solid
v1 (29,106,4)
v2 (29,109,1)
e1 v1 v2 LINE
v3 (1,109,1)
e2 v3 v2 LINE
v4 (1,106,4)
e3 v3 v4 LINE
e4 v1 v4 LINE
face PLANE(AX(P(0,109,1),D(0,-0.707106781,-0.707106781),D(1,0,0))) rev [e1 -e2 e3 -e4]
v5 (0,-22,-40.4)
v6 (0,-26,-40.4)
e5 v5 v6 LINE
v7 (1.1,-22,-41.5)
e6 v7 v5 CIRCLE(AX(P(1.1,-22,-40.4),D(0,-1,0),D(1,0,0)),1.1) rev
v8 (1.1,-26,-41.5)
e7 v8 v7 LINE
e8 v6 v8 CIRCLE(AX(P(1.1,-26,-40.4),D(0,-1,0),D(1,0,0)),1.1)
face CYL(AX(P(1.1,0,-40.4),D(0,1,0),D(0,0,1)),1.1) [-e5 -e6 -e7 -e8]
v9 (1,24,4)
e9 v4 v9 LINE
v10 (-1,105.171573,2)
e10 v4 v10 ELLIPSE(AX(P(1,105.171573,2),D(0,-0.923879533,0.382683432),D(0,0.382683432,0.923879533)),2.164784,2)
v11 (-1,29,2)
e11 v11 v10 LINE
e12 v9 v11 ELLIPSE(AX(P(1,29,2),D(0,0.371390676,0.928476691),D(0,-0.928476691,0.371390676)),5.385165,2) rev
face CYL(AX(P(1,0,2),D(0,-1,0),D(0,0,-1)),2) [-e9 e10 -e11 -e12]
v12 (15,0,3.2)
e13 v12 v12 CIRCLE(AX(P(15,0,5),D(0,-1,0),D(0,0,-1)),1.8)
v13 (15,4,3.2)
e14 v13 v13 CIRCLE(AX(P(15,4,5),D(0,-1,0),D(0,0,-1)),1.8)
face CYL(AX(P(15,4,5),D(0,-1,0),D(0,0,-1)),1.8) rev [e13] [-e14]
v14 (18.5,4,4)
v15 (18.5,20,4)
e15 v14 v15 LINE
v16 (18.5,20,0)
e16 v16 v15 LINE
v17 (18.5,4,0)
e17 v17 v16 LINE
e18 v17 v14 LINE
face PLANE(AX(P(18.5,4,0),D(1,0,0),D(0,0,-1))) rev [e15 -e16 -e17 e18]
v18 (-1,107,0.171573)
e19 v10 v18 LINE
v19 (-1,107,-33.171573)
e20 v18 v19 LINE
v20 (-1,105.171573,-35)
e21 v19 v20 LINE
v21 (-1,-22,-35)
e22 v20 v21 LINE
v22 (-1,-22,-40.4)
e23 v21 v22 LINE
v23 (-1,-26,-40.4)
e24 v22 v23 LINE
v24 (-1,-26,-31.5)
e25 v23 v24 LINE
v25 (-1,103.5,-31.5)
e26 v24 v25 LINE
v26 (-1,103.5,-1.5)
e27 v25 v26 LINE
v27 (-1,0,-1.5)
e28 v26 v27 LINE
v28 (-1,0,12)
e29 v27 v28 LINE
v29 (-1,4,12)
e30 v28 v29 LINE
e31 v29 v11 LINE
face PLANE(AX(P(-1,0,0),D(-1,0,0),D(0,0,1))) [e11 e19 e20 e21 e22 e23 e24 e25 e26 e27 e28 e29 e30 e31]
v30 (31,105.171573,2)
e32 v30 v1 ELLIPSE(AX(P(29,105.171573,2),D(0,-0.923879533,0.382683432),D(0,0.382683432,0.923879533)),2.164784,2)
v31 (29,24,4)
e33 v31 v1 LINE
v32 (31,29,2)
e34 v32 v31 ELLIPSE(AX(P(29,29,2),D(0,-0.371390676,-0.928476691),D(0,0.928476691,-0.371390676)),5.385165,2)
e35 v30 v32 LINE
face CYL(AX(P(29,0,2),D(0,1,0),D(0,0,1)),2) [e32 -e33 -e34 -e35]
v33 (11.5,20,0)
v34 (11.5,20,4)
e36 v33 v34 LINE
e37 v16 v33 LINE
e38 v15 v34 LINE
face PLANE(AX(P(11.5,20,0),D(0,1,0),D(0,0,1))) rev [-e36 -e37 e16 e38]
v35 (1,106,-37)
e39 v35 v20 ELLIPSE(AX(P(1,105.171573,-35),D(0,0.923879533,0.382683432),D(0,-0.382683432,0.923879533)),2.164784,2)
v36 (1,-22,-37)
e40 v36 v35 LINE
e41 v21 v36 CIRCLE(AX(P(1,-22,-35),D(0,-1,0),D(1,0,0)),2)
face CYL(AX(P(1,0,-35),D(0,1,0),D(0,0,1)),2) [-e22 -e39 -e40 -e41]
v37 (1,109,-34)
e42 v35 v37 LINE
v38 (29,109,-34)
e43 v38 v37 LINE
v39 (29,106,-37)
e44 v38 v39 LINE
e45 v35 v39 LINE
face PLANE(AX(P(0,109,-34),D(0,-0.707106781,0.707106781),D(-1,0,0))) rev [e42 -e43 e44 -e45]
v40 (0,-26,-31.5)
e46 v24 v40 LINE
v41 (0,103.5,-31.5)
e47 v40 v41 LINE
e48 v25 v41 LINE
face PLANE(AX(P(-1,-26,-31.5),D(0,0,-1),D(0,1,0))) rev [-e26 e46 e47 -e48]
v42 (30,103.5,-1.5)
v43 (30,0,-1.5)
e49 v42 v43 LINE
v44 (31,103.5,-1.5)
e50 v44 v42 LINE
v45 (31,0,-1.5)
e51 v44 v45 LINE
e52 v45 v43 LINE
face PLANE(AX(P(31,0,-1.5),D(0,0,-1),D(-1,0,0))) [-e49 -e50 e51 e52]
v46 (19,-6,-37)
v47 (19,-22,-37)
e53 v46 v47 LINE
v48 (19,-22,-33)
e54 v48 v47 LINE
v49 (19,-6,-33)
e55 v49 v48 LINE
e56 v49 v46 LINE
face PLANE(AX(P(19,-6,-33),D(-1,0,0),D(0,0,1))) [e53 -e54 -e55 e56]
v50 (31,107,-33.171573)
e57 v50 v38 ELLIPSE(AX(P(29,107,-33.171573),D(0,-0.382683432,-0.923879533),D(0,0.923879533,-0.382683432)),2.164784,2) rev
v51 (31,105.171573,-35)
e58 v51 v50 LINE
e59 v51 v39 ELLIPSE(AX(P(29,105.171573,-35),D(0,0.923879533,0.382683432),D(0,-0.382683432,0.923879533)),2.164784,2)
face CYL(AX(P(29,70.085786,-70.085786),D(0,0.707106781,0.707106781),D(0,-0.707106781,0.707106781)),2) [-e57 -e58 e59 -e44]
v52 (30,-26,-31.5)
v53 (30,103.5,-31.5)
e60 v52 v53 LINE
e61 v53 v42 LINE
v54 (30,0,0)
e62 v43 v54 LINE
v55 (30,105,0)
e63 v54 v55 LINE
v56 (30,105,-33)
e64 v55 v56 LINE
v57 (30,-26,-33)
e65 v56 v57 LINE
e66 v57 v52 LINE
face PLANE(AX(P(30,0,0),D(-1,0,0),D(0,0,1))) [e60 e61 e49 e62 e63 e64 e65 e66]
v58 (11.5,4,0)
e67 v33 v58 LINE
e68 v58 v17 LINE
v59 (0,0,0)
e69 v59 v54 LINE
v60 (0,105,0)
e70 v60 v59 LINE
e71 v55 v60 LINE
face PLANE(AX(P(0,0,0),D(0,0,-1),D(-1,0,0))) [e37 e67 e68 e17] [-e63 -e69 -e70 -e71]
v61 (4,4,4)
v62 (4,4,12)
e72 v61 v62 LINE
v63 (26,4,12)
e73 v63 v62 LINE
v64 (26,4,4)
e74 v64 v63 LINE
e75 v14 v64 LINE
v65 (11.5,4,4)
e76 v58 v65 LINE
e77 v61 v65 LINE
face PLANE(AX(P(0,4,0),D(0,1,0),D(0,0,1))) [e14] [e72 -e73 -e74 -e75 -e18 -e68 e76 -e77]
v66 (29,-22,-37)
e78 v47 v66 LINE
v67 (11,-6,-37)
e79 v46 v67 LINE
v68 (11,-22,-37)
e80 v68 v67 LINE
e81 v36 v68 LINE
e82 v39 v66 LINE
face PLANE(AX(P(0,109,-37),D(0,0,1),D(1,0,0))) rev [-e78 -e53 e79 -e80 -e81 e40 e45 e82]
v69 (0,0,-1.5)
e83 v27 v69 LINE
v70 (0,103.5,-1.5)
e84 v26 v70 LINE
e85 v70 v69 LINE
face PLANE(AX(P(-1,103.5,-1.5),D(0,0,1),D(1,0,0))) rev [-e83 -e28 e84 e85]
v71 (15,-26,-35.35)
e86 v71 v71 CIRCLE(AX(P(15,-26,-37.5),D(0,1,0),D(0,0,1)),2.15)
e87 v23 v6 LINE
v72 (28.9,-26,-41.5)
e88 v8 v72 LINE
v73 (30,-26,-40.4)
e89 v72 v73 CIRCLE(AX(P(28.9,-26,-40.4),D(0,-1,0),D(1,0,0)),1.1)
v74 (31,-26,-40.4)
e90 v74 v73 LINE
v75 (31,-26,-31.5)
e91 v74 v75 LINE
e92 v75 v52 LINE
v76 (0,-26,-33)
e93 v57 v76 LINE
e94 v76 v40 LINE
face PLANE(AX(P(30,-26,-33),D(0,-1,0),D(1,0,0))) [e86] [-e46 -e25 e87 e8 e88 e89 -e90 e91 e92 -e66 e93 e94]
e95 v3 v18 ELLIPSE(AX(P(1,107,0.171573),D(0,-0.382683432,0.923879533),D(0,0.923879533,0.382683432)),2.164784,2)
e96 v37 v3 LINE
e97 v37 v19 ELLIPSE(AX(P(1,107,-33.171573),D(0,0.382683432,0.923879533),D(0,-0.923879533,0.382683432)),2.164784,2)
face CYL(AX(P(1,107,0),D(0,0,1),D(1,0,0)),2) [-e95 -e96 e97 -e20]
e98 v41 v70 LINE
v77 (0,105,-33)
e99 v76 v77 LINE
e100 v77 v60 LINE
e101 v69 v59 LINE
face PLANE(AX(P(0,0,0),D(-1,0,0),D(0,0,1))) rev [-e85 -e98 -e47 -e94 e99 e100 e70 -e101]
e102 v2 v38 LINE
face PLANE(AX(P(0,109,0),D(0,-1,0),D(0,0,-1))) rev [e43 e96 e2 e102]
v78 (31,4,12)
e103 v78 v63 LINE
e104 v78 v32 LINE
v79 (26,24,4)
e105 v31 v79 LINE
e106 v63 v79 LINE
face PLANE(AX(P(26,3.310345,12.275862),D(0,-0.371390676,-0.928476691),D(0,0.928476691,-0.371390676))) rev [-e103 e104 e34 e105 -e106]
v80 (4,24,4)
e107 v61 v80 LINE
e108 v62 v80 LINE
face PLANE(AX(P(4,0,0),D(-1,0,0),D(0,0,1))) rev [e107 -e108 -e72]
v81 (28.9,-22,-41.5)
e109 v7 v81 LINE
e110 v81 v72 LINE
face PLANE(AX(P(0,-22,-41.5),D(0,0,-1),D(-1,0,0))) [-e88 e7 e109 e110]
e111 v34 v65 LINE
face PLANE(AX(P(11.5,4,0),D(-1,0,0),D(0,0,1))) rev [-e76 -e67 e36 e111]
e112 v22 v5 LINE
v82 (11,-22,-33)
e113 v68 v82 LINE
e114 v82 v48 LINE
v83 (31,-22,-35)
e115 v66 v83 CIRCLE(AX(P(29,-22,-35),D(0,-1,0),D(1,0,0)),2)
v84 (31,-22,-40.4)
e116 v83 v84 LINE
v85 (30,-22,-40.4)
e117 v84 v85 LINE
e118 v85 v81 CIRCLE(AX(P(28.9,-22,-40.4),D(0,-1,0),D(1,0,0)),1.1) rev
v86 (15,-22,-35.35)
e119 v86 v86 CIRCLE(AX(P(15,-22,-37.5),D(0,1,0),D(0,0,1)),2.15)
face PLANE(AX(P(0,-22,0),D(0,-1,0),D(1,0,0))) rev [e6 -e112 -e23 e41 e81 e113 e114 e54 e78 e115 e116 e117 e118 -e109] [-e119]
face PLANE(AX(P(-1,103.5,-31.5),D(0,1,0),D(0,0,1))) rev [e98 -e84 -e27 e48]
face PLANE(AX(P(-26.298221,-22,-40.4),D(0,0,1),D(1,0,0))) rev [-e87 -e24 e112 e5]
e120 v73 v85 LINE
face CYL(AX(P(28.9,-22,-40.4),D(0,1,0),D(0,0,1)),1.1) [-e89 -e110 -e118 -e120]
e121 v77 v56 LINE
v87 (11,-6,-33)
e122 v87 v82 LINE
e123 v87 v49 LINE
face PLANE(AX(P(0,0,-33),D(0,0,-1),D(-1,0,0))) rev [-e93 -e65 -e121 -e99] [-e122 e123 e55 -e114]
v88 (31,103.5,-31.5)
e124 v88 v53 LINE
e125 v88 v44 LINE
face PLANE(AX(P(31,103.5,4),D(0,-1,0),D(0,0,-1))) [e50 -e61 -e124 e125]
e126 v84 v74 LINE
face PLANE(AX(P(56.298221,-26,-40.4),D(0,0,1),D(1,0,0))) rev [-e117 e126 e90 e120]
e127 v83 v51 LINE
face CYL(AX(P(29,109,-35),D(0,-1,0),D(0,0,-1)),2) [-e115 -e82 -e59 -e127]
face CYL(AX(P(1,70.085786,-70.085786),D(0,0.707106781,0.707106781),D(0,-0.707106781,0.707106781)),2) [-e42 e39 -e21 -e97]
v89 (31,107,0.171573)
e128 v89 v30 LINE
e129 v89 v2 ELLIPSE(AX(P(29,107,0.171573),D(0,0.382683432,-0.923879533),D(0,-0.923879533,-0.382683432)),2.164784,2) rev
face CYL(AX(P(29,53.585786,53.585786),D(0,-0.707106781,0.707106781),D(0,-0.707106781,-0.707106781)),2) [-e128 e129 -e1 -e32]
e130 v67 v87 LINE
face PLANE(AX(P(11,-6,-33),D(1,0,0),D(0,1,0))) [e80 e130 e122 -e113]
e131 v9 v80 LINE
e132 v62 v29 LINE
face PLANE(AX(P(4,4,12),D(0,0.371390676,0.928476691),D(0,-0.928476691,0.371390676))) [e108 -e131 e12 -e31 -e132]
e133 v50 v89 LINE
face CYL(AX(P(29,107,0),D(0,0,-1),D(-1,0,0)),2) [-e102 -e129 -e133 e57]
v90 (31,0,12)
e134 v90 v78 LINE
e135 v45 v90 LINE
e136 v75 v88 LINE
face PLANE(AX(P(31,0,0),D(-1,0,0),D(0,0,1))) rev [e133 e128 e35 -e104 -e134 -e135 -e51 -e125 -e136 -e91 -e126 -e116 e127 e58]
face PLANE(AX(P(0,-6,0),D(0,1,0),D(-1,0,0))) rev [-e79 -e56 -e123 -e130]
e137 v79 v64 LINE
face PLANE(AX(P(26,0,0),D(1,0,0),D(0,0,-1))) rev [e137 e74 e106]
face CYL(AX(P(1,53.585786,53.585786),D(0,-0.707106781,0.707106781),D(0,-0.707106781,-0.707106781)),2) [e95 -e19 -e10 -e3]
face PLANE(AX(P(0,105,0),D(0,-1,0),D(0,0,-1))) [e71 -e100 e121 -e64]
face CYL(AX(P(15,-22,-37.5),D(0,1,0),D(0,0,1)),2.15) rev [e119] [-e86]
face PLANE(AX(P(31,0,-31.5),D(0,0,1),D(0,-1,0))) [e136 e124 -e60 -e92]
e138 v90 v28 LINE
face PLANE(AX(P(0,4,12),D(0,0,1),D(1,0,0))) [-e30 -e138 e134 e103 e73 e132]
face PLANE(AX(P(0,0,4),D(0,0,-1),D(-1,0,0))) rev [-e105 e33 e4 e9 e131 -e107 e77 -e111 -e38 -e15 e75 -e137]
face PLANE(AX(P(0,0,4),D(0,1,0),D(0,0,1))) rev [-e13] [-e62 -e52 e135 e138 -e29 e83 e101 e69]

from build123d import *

# Parameters (mm, degrees)
SKETCH1_W            = 30
SKETCH1_H            = 105
BOSS_EXTRUDE1_DEPTH  = 4
SKETCH2_W            = 30
SKETCH2_H            = 12
SKETCH2_R            = 1.8
BOSS_EXTRUDE2_DEPTH  = 4
SKETCH3_W            = 7
SKETCH3_H            = 16
CUT_EXTRUDE1_DEPTH   = 110.494292089
BOSS_EXTRUDE3_DEPTH  = 4
BOSS_EXTRUDE4_START  = -30
BOSS_EXTRUDE4_DEPTH  = 4
SKETCH5_W            = 30
SKETCH5_H            = 41
BOSS_EXTRUDE5_DEPTH  = 4
SKETCH6_W            = 30
SKETCH6_H            = 135
BOSS_EXTRUDE6_DEPTH  = 4
SKETCH7_W            = 30
SKETCH7_H            = 8.5
BOSS_EXTRUDE7_DEPTH  = 4
FILLET1_R            = 1.1
SKETCH10_W           = 2.15
SKETCH10_H           = 4
SKETCH11_W           = 8
SKETCH11_H           = 8.5
CUT_EXTRUDE2_DEPTH   = 16
SKETCH14_W           = 1.8
SKETCH14_H           = 30
BOSS_EXTRUDE8_DEPTH  = 1
SKETCH16_W           = 3.4
SKETCH16_H           = 4
BOSS_EXTRUDE10_DEPTH = 1
BOSS_EXTRUDE9_START  = -30
BOSS_EXTRUDE9_DEPTH  = 1
SKETCH17_W           = 3.4
SKETCH17_H           = 4
BOSS_EXTRUDE11_DEPTH = 1
CHAMFER1_SIZE        = 3
FILLET2_R            = 2


with BuildPart() as part:
    # Sketch1 → Boss-Extrude1 (new body)
    with BuildSketch(Plane.XY):
        with Locations((15, 52.5)):
            Rectangle(SKETCH1_W, SKETCH1_H)
    extrude(amount=BOSS_EXTRUDE1_DEPTH)

    # Sketch2 → Boss-Extrude2 (add)
    with BuildSketch(Plane.XZ):
        with Locations((15, 6)):
            Rectangle(SKETCH2_W, SKETCH2_H)
        with Locations((15, 5)):
            Circle(SKETCH2_R, mode=Mode.SUBTRACT)
    extrude(amount=-BOSS_EXTRUDE2_DEPTH)

    # Sketch3 → Cut-Extrude1 (cut, through all)
    with BuildSketch(Plane.XY.offset(4)):
        with Locations((15, 12)):
            Rectangle(SKETCH3_W, SKETCH3_H)
    extrude(amount=-CUT_EXTRUDE1_DEPTH, mode=Mode.SUBTRACT)

    # Sketch4 → Boss-Extrude3 (add)
    with BuildSketch(Plane.ZY):
        Polygon((12, 4), (0, 34), (0, 4), align=None)
    extrude(amount=-BOSS_EXTRUDE3_DEPTH)

    # Sketch4<2> → Boss-Extrude4 (add)
    with BuildSketch(Plane.ZY.offset(BOSS_EXTRUDE4_START)):
        Polygon((12, 4), (0, 34), (0, 4), align=None)
    extrude(amount=BOSS_EXTRUDE4_DEPTH)

    # Sketch5 → Boss-Extrude5 (add)
    with BuildSketch(Plane(origin=(0, 105, 0), x_dir=(1, 0, 0), z_dir=(0, 1, 0))):
        with Locations((15, 16.5)):
            Rectangle(SKETCH5_W, SKETCH5_H)
    extrude(amount=BOSS_EXTRUDE5_DEPTH)

    # Sketch6 → Boss-Extrude6 (add)
    with BuildSketch(Plane(origin=(0, 0, -37), x_dir=(-1, 0, 0), z_dir=(0, 0, -1))):
        with Locations((-15, 41.5)):
            Rectangle(SKETCH6_W, SKETCH6_H)
    extrude(amount=-BOSS_EXTRUDE6_DEPTH)

    # Sketch7 → Boss-Extrude7 (add)
    with BuildSketch(Plane.XZ.offset(26)):
        with Locations((15, -37.25)):
            Rectangle(SKETCH7_W, SKETCH7_H)
    extrude(amount=-BOSS_EXTRUDE7_DEPTH)

    # Fillet1
    fillet1_edges = [part.edges().sort_by_distance(p)[0] for p in [
        (0, -24, -41.5),
        (30, -24, -41.5),
    ]]
    fillet(fillet1_edges, radius=FILLET1_R)

    # Sketch10 → Ø4.3 (4.3) Diameter Hole1 (revolve, cut)
    with BuildSketch(Plane(origin=(15, -22, -37.5), x_dir=(0, 0, 1), z_dir=(1, 0, 0))):
        with Locations((1.075, 2)):
            Rectangle(SKETCH10_W, SKETCH10_H)
    revolve(axis=Axis((15, -15.65, -37.5), (0, -1, 0)), mode=Mode.SUBTRACT)

    # Sketch11 → Cut-Extrude2 (cut)
    with BuildSketch(Plane(origin=(0, -22, 0), x_dir=(1, 0, 0), z_dir=(0, 1, 0))):
        with Locations((15, 37.25)):
            Rectangle(SKETCH11_W, SKETCH11_H)
    extrude(amount=CUT_EXTRUDE2_DEPTH, mode=Mode.SUBTRACT)

    # Sketch14 → Ø3.6 (3.6) Diameter Hole1 (revolve, cut)
    with BuildSketch(Plane(origin=(15, 4, 5), x_dir=(0, 0, 1), z_dir=(1, 0, 0))):
        with Locations((0.9, 15)):
            Rectangle(SKETCH14_W, SKETCH14_H)
    revolve(axis=Axis((15, 10.35, 5), (0, -1, 0)), mode=Mode.SUBTRACT)

    # Sketch15 → Boss-Extrude8 (add)
    with BuildSketch(Plane.ZY):
        Polygon((-37, 109), (4, 109), (4, 0), (-1.5, 0), (-1.5, 103.5), (-31.5, 103.5), (-31.5, -26), (-37, -26), align=None)
    extrude(amount=BOSS_EXTRUDE8_DEPTH)

    # Sketch16 → Boss-Extrude10 (add)
    with BuildSketch(Plane.ZY):
        Polygon((4, 24), (4, 0), (12, 0), (12, 4), align=None)
        with Locations((-38.7, -24)):
            Rectangle(SKETCH16_W, SKETCH16_H)
    extrude(amount=BOSS_EXTRUDE10_DEPTH)

    # Sketch15<2> → Boss-Extrude9 (add)
    with BuildSketch(Plane.ZY.offset(BOSS_EXTRUDE9_START)):
        Polygon((-37, 109), (4, 109), (4, 0), (-1.5, 0), (-1.5, 103.5), (-31.5, 103.5), (-31.5, -26), (-37, -26), align=None)
    extrude(amount=-BOSS_EXTRUDE9_DEPTH)

    # Sketch17 → Boss-Extrude11 (add)
    with BuildSketch(Plane(origin=(30, 0, 0), x_dir=(0, 0, -1), z_dir=(1, 0, 0))):
        Polygon((-12, 0), (-4, 0), (-4, 24), (-12, 4), align=None)
        with Locations((38.7, -24)):
            Rectangle(SKETCH17_W, SKETCH17_H)
    extrude(amount=BOSS_EXTRUDE11_DEPTH)

    # Chamfer1
    chamfer1_edges = [part.edges().sort_by_distance(p)[0] for p in [
        (15, 109, 4),
        (15, 109, -37),
    ]]
    chamfer(chamfer1_edges, length=CHAMFER1_SIZE)

    # Fillet2
    # the kernel refuses this fillet: 2 mm, written as the material it takes off along each edge
    with BuildSketch(Plane(origin=(-1, 111, 4), x_dir=(1, 0, 0), z_dir=(0, -1, 0))) as fillet2_piece_1_section:
        with BuildLine():
            CenterArc((FILLET2_R, -FILLET2_R), FILLET2_R, 90, 90)
            Line((0, -FILLET2_R), (0, 0))
            Line((0, 0), (FILLET2_R, 0))
        make_face()
    fillet2_piece_1 = extrude(amount=92, mode=Mode.PRIVATE)
    fillet2_piece_1 = split(fillet2_piece_1, bisect_by=Plane(origin=(-0.544012224, 62.136356158, -11.254542463), z_dir=(0, 0.3713906763541038, 0.9284766908852594)), keep=Keep.TOP, mode=Mode.PRIVATE)
    add(fillet2_piece_1, mode=Mode.SUBTRACT)
    with BuildSketch(Plane(origin=(31, 111, 4), x_dir=(-1, 0, 0), z_dir=(0, -1, 0))) as fillet2_piece_2_section:
        with BuildLine():
            CenterArc((FILLET2_R, FILLET2_R), FILLET2_R, 180, 90)
            Line((0, FILLET2_R), (0, 0))
            Line((0, 0), (FILLET2_R, 0))
        make_face()
    fillet2_piece_2 = extrude(amount=92, mode=Mode.PRIVATE)
    fillet2_piece_2 = split(fillet2_piece_2, bisect_by=Plane(origin=(30.544012224, 62.136356158, -11.254542463), z_dir=(0, 0.37139067635410367, 0.9284766908852594)), keep=Keep.TOP, mode=Mode.PRIVATE)
    add(fillet2_piece_2, mode=Mode.SUBTRACT)
    with BuildSketch(Plane(origin=(-1, 109, -39), x_dir=(0, -1, 0), z_dir=(0, 0, 1))) as fillet2_piece_3:
        with BuildLine():
            CenterArc((FILLET2_R, FILLET2_R), FILLET2_R, 180, 90)
            Line((0, FILLET2_R), (0, 0))
            Line((0, 0), (FILLET2_R, 0))
        make_face()
    extrude(amount=45, mode=Mode.SUBTRACT)
    with BuildSketch(Plane(origin=(31, 109, -39), x_dir=(0, -1, 0), z_dir=(0, 0, 1))) as fillet2_piece_4:
        with BuildLine():
            CenterArc((FILLET2_R, -FILLET2_R), FILLET2_R, 90, 90)
            Line((0, -FILLET2_R), (0, 0))
            Line((0, 0), (FILLET2_R, 0))
        make_face()
    extrude(amount=45, mode=Mode.SUBTRACT)
    with BuildSketch(Plane(origin=(-1, -22, -37), x_dir=(0, 0, 1), z_dir=(0, 1, 0))) as fillet2_piece_5:
        with BuildLine():
            CenterArc((FILLET2_R, FILLET2_R), FILLET2_R, 180, 90)
            Line((0, FILLET2_R), (0, 0))
            Line((0, 0), (FILLET2_R, 0))
        make_face()
    extrude(amount=133, mode=Mode.SUBTRACT)
    with BuildSketch(Plane(origin=(-1, 102.464466094, 7.535533906), x_dir=(0, -0.7071067811865476, -0.7071067811865476), z_dir=(0, 0.7071067811865476, -0.7071067811865476)), Plane(origin=(-1, 112.535533906, -30.464466094), x_dir=(0, -0.7071067811865476, 0.7071067811865476), z_dir=(0, -0.7071067811865476, -0.7071067811865476)), Plane(origin=(31, 102.464466094, 7.535533906), x_dir=(-1, 0, 0), z_dir=(0, 0.7071067811865476, -0.7071067811865476))) as fillet2_piece_6:
        with BuildLine():
            CenterArc((FILLET2_R, -FILLET2_R), FILLET2_R, 90, 90)
            Line((0, -FILLET2_R), (0, 0))
            Line((0, 0), (FILLET2_R, 0))
        make_face()
    extrude(amount=14.242640687, mode=Mode.SUBTRACT)
    with BuildSketch(Plane(origin=(31, -22, -37), x_dir=(0, 0, 1), z_dir=(0, 1, 0))) as fillet2_piece_7:
        with BuildLine():
            CenterArc((FILLET2_R, -FILLET2_R), FILLET2_R, 90, 90)
            Line((0, -FILLET2_R), (0, 0))
            Line((0, 0), (FILLET2_R, 0))
        make_face()
    extrude(amount=133, mode=Mode.SUBTRACT)
    with BuildSketch(Plane(origin=(31, 112.535533906, -30.464466094), x_dir=(0, -0.7071067811865476, 0.7071067811865476), z_dir=(0, -0.7071067811865476, -0.7071067811865476))) as fillet2_piece_8:
        with BuildLine():
            CenterArc((FILLET2_R, FILLET2_R), FILLET2_R, 180, 90)
            Line((0, FILLET2_R), (0, 0))
            Line((0, 0), (FILLET2_R, 0))
        make_face()
    extrude(amount=14.242640687, mode=Mode.SUBTRACT)


solid = part.part
